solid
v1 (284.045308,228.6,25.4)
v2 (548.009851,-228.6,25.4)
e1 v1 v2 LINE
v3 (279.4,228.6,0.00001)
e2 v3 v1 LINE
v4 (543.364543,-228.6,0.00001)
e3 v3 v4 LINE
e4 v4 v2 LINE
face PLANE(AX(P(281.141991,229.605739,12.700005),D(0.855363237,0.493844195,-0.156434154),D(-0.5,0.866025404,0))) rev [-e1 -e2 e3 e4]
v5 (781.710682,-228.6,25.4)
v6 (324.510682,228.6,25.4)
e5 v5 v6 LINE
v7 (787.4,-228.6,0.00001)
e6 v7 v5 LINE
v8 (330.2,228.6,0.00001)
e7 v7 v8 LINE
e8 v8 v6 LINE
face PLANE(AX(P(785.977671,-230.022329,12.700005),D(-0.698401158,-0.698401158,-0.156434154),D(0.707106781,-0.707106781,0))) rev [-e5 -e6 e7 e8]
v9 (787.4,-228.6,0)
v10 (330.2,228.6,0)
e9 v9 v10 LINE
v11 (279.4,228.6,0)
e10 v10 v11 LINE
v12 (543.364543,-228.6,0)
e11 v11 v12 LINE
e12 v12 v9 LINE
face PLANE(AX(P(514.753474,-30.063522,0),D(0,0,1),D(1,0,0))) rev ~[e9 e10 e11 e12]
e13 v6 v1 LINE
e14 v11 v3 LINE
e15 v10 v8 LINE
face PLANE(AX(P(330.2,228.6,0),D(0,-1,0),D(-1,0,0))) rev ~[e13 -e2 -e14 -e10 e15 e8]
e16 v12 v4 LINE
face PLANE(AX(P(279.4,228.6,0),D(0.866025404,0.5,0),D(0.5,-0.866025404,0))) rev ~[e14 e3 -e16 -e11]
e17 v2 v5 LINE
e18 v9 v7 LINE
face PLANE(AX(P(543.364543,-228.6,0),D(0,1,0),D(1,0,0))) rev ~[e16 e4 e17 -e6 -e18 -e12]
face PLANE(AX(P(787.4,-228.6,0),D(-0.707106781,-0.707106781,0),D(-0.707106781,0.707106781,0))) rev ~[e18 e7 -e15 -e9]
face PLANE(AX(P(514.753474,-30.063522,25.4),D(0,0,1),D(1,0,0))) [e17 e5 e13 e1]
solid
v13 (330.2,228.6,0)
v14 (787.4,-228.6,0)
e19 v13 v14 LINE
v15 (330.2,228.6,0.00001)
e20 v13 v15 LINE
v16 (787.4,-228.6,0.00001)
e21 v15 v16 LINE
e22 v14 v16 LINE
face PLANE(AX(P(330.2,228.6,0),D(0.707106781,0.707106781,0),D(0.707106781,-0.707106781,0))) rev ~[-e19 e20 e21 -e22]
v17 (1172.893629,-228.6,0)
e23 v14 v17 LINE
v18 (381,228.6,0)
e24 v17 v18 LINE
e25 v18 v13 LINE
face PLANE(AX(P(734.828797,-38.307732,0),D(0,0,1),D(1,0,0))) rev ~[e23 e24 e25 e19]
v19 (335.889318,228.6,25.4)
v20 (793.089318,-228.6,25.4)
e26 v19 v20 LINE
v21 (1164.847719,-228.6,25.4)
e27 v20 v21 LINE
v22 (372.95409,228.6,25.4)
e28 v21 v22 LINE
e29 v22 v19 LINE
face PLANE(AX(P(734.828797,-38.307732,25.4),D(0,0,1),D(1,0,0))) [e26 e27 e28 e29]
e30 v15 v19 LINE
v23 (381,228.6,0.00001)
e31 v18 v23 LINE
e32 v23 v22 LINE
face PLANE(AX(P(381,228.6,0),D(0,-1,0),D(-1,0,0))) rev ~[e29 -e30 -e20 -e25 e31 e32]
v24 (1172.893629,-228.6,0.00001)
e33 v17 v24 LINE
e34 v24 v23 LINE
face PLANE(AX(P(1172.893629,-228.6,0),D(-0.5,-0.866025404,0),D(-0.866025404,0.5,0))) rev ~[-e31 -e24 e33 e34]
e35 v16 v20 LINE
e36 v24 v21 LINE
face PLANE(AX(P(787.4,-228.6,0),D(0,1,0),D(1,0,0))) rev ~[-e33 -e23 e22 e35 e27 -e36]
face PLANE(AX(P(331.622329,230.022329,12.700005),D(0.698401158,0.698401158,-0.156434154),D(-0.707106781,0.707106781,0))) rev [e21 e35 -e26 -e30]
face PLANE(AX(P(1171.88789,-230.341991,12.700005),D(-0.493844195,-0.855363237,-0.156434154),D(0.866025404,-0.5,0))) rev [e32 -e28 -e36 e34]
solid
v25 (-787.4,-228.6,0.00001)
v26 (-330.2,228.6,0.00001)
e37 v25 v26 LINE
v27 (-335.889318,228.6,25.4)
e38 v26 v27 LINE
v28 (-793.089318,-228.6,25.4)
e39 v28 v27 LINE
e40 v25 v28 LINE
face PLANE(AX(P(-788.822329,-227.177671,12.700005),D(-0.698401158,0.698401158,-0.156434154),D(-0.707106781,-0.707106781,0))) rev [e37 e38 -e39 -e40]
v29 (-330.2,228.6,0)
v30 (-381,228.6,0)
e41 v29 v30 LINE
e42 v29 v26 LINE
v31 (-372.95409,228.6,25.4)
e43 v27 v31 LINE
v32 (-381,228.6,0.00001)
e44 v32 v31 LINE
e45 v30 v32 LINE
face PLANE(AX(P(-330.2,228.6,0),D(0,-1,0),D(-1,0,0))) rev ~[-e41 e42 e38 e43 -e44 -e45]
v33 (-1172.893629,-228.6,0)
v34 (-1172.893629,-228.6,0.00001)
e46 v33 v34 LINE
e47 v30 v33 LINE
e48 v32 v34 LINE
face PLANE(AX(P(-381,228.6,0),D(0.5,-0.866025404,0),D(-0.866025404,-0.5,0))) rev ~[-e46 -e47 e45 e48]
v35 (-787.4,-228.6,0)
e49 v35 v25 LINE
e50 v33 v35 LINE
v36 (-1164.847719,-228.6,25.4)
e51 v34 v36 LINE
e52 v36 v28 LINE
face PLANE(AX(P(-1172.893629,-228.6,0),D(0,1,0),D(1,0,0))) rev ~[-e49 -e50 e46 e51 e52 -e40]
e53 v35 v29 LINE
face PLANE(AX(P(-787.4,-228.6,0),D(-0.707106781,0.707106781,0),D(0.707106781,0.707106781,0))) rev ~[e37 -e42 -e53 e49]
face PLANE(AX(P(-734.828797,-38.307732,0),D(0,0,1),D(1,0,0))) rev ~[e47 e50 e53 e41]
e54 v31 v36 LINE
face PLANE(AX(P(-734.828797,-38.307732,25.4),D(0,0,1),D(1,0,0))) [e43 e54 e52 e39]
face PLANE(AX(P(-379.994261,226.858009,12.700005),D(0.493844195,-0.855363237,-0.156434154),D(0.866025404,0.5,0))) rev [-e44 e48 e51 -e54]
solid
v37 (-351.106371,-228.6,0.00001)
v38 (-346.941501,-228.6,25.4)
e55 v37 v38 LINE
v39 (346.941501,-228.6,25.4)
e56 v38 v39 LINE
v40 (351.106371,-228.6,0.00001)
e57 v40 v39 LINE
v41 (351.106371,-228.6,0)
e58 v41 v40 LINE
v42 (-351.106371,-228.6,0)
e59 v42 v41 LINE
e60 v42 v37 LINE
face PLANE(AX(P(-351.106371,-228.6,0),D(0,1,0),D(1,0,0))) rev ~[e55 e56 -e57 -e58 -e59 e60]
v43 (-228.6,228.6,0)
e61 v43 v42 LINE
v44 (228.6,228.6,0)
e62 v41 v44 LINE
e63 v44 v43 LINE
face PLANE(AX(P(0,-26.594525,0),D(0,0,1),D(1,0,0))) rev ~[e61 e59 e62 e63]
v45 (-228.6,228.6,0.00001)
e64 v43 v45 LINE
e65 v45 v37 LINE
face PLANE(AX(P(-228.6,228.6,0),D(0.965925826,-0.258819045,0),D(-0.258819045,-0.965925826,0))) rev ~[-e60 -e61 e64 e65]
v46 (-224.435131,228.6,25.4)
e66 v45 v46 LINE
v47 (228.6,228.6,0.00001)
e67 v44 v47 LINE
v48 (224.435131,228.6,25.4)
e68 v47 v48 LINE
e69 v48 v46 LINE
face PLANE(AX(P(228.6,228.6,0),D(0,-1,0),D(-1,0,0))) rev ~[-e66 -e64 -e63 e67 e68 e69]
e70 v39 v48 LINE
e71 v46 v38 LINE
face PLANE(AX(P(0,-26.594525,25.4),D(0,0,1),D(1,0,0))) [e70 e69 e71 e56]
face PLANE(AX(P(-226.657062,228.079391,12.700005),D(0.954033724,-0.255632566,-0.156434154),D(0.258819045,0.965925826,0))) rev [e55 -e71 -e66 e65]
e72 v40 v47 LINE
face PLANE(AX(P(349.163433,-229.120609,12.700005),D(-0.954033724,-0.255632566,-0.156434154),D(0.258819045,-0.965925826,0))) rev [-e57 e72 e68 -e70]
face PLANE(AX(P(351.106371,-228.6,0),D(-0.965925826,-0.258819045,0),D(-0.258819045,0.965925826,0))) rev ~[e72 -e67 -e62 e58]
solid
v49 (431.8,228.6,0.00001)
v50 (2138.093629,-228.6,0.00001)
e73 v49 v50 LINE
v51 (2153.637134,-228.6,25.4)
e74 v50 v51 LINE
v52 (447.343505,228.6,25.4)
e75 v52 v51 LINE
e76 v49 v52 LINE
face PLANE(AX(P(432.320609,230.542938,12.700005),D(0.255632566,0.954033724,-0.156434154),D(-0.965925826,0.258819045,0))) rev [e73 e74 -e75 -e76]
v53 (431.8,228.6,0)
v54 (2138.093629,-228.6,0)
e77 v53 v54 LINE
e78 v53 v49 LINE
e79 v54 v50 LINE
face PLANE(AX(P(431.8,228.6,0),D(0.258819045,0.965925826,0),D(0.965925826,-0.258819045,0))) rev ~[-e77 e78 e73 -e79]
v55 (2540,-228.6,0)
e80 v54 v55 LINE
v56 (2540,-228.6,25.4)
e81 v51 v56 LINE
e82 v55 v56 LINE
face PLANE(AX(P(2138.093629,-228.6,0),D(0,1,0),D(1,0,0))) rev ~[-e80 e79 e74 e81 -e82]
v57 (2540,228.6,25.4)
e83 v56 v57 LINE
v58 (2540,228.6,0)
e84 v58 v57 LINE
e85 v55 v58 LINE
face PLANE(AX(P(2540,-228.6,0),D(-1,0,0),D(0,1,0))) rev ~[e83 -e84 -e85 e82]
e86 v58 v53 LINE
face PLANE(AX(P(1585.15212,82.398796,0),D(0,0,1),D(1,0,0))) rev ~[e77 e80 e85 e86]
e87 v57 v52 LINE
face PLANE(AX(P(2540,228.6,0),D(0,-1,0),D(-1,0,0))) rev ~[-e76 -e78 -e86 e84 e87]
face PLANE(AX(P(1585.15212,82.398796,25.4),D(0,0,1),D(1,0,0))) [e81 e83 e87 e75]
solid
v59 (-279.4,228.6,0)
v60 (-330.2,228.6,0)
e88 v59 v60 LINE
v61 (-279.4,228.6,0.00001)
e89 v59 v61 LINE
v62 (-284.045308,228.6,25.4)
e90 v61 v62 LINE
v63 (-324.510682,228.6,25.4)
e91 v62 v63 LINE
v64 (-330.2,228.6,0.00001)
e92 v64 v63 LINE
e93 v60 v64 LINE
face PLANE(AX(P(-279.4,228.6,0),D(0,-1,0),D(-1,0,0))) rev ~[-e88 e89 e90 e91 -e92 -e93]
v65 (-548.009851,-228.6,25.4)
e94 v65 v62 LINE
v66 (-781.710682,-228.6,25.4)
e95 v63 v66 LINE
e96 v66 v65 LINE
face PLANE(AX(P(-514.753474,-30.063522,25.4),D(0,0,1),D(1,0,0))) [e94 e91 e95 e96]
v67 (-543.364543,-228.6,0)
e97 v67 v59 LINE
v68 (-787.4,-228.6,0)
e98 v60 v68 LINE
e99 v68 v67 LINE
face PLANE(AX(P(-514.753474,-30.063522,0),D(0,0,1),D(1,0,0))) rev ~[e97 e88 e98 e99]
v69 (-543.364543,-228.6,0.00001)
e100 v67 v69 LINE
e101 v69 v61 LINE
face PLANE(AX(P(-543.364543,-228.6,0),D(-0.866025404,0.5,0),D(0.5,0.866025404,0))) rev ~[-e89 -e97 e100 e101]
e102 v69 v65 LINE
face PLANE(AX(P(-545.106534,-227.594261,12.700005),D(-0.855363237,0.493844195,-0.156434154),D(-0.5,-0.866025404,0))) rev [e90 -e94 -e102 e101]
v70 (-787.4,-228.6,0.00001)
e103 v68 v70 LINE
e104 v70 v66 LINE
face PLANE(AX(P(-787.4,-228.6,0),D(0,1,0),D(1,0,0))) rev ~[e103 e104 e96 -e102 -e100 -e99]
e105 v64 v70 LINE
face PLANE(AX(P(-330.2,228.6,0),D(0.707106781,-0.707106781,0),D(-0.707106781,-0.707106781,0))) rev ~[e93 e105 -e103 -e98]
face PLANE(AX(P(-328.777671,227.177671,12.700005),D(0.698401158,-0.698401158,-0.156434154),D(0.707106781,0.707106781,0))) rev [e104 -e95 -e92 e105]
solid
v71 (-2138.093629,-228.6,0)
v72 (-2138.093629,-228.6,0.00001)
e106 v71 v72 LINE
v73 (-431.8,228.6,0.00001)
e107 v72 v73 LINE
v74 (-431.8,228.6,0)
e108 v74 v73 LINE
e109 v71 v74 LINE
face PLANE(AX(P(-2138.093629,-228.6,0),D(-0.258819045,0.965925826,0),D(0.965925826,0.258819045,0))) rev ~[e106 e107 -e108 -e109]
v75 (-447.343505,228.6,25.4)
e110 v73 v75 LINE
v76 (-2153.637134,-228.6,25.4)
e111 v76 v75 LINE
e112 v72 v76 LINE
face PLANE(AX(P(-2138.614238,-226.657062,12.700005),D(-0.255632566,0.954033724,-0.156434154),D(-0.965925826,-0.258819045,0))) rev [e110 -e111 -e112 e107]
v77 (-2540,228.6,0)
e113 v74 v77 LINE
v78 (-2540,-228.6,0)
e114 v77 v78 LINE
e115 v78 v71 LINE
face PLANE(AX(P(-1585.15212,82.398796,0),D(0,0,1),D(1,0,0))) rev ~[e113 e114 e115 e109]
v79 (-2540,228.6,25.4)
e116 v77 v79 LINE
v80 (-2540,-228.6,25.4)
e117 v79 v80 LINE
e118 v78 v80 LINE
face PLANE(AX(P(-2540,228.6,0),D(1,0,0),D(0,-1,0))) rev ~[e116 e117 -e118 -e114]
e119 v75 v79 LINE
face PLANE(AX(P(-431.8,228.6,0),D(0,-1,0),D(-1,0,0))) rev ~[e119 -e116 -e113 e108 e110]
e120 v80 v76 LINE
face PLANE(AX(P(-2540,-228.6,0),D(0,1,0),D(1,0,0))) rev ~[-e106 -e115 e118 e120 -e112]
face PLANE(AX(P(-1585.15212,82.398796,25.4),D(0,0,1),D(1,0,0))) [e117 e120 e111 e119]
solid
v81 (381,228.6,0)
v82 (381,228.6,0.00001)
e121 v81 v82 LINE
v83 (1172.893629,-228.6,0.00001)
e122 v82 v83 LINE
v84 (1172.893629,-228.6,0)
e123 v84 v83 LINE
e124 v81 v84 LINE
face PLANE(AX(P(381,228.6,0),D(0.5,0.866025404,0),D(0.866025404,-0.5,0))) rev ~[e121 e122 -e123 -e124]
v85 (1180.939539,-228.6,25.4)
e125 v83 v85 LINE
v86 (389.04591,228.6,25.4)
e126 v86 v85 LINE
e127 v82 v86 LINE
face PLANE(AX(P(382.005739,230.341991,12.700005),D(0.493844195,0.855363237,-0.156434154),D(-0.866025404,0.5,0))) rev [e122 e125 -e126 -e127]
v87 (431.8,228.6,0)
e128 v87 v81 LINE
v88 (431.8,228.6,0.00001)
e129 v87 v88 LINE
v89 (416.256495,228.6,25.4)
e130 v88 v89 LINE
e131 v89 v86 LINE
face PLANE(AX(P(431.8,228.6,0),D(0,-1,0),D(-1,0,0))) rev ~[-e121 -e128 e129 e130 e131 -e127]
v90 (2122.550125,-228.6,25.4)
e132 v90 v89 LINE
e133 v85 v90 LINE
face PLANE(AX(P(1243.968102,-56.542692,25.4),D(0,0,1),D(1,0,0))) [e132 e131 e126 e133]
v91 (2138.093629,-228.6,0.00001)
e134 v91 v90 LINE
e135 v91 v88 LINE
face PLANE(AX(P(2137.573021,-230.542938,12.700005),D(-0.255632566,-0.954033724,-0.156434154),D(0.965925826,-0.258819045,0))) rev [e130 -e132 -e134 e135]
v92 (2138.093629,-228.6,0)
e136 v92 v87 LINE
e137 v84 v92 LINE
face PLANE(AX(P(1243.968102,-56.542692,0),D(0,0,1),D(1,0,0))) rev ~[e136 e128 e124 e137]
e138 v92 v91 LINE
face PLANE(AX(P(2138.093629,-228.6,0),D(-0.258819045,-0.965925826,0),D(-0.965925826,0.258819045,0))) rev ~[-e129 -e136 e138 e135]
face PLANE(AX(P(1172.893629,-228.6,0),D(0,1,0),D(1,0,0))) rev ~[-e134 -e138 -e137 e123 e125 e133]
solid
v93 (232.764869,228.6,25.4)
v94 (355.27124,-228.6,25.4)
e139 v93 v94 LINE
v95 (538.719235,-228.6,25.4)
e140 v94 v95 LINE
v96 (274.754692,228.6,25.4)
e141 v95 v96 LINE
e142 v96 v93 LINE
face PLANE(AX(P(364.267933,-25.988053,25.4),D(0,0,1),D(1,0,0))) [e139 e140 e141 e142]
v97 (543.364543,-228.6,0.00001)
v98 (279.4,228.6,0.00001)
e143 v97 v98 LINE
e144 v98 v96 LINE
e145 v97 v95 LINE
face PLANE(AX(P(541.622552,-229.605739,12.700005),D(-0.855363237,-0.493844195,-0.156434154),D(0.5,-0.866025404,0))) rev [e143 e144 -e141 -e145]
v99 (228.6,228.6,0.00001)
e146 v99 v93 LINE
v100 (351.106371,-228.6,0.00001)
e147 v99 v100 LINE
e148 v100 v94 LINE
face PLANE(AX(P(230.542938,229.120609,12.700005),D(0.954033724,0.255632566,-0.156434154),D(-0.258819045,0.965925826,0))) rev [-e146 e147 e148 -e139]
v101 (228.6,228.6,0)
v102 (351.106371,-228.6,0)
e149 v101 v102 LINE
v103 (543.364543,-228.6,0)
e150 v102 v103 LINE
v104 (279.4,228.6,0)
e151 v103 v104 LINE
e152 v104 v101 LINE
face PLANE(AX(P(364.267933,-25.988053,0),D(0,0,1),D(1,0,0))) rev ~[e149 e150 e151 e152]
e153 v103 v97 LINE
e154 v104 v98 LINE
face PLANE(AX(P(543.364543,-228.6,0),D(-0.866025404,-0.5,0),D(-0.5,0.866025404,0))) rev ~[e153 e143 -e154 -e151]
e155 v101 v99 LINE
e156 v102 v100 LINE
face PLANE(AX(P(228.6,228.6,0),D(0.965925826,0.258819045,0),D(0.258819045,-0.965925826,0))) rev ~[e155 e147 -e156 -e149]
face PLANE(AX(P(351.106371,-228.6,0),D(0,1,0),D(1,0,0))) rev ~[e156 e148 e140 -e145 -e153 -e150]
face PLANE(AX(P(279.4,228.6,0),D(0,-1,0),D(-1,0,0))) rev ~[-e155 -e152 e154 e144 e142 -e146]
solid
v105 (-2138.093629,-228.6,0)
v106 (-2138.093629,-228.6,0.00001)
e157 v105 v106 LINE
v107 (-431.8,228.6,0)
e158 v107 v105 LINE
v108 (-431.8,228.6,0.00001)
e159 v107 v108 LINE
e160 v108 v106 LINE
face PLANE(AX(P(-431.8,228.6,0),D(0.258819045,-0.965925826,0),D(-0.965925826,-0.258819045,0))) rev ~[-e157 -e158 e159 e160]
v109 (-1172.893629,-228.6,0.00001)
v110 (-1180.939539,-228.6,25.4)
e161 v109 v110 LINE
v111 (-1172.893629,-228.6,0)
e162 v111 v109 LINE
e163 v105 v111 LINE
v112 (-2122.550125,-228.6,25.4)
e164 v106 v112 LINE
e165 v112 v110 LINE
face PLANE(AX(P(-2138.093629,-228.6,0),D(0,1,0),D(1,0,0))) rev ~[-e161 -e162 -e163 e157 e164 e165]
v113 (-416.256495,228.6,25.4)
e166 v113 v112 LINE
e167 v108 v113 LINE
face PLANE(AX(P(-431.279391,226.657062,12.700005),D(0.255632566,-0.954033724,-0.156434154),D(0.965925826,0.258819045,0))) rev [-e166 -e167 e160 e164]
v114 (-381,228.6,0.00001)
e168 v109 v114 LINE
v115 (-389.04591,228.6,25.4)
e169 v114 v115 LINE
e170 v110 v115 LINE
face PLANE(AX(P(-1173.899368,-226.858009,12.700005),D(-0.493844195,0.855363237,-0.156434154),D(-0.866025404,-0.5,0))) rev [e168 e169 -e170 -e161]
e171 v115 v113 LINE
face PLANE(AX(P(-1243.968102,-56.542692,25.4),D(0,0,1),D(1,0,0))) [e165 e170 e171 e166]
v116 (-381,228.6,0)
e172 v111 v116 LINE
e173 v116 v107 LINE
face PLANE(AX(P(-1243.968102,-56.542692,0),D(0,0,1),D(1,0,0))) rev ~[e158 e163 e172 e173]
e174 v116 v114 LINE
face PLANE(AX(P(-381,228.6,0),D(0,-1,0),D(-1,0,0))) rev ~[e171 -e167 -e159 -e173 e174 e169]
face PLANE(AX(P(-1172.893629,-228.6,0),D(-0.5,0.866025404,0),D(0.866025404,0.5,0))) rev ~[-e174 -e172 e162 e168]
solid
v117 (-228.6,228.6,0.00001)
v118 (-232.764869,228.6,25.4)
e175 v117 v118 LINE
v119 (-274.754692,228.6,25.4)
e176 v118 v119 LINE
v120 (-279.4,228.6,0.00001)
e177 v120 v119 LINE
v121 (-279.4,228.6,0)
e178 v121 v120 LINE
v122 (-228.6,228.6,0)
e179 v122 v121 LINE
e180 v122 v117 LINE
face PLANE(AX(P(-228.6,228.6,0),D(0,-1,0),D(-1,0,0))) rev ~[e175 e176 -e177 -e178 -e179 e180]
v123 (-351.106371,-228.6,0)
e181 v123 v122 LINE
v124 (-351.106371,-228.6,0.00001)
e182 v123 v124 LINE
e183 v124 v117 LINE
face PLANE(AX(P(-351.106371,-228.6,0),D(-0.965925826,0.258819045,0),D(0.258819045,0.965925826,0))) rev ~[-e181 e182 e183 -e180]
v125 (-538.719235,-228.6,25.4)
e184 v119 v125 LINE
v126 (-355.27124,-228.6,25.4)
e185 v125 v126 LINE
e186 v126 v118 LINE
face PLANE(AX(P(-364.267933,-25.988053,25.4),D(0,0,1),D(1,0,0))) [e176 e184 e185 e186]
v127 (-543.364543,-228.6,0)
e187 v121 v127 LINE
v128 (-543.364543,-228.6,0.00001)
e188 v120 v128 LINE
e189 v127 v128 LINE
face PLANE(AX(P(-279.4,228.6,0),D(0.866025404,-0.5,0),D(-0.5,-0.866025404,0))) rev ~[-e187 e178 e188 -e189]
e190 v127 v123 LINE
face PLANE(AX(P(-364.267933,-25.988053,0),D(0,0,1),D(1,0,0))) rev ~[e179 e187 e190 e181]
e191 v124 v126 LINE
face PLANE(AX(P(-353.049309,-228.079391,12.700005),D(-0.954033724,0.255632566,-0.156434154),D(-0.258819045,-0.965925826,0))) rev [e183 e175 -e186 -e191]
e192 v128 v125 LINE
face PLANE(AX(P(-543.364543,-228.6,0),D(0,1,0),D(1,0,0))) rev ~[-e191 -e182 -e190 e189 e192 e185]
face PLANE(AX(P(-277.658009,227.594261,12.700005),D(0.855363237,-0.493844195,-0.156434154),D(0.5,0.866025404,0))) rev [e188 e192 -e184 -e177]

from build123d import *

# Parameters (mm, degrees)
F2_DEPTH    = 25.4
F3_DEPTH    = 25.4
F4_DEPTH    = 25.4
F5_DEPTH    = 25.4
F6_DEPTH    = 25.4
F7_DEPTH    = 25.4
F8_DEPTH    = 25.4
F9_DEPTH    = 25.4
F10_DEPTH   = 25.4
F11_DEPTH   = 25.4
F12_DEPTH   = 25.4
F13_SIZE2   = 4.022955
F13_SIZE    = 25.39999
F14_SIZE2   = 4.022955
F14_SIZE    = 25.39999
F14_2_SIZE2 = 4.022955
F14_2_SIZE  = 25.39999
F15_SIZE2   = 4.022955
F15_SIZE    = 25.39999
F15_2_SIZE2 = 4.022955
F15_2_SIZE  = 25.39999
F16_SIZE2   = 4.022955
F16_SIZE    = 25.39999
F16_2_SIZE2 = 4.022955
F16_2_SIZE  = 25.39999
F17_SIZE2   = 4.022955
F17_SIZE    = 25.39999
F17_2_SIZE2 = 4.022955
F17_2_SIZE  = 25.39999
F18_SIZE2   = 4.022955
F18_SIZE    = 25.39999
F18_2_SIZE2 = 4.022955
F18_2_SIZE  = 25.39999
F19_SIZE2   = 4.022955
F19_SIZE    = 25.39999
F19_2_SIZE2 = 4.022955
F19_2_SIZE  = 25.39999
F20_SIZE2   = 4.022955
F20_SIZE    = 25.39999
F20_2_SIZE2 = 4.022955
F20_2_SIZE  = 25.39999
F21_SIZE2   = 4.022955
F21_SIZE    = 25.39999
F21_2_SIZE2 = 4.022955
F21_2_SIZE  = 25.39999
F22_SIZE2   = 4.022955
F22_SIZE    = 25.39999
F22_2_SIZE2 = 4.022955
F22_2_SIZE  = 25.39999
F23_SIZE2   = 4.022955
F23_SIZE    = 25.39999


# Not quite as in the source:
# - a fillet or chamfer is up to 0.001 mm smaller than in the source, because OpenCascade refuses the exact size


with BuildPart() as f2:
    # F1 (on Top) → F2 (new body)
    with BuildSketch(Plane.XY):
        Polygon((-431.8, 228.6), (-2540, 228.6), (-2540, -228.6), (-2138.0936292205, -228.6), align=None)
    extrude(amount=F2_DEPTH)

    # F13 (size 25.4 and 4.0229647842 in the source; OpenCascade refuses exactly that, so slightly less here)
    f13_edges = [f2.edges().sort_by_distance(p)[0] for p in [
        (-1284.946815, 0, 25.4),
    ]]
    f13_side = f2.faces().sort_by_distance((-1284.946815, 0, 12.7))[0]
    chamfer(f13_edges, length=F13_SIZE, length2=F13_SIZE2, reference=f13_side)


with BuildPart() as f3:
    # F1 (on Top) → F3 (new body)
    with BuildSketch(Plane.XY):
        Polygon((-381, 228.6), (-431.8, 228.6), (-2138.0936292205, -228.6), (-1172.8936292205, -228.6), align=None)
    extrude(amount=F3_DEPTH)

    # F14 (size 25.4 and 4.0229647842 in the source; OpenCascade refuses exactly that, so slightly less here)
    f14_edges = [f3.edges().sort_by_distance(p)[0] for p in [
        (-1284.946815, 0, 25.4),
    ]]
    f14_side = f3.faces().sort_by_distance((-1284.946815, 0, 12.7))[0]
    chamfer(f14_edges, length=F14_SIZE, length2=F14_SIZE2, reference=f14_side)

    # F14#2 (size 25.4 and 4.0229647842 in the source; OpenCascade refuses exactly that, so slightly less here)
    f14_2_edges = [f3.edges().sort_by_distance(p)[0] for p in [
        (-776.946815, 0, 25.4),
    ]]
    f14_2_side = f3.faces().sort_by_distance((-776.946815, 0, 12.7))[0]
    chamfer(f14_2_edges, length=F14_2_SIZE, length2=F14_2_SIZE2, reference=f14_2_side)


with BuildPart() as f4:
    # F1 (on Top) → F4 (new body)
    with BuildSketch(Plane.XY):
        Polygon((-330.2, 228.6), (-381, 228.6), (-1172.8936292205, -228.6), (-787.4, -228.6), align=None)
    extrude(amount=F4_DEPTH)

    # F15 (size 25.4 and 4.0229647842 in the source; OpenCascade refuses exactly that, so slightly less here)
    f15_edges = [f4.edges().sort_by_distance(p)[0] for p in [
        (-776.946815, 0, 25.4),
    ]]
    f15_side = f4.faces().sort_by_distance((-776.946815, 0, 12.7))[0]
    chamfer(f15_edges, length=F15_SIZE, length2=F15_SIZE2, reference=f15_side)

    # F15#2 (size 25.4 and 4.0229647842 in the source; OpenCascade refuses exactly that, so slightly less here)
    f15_2_edges = [f4.edges().sort_by_distance(p)[0] for p in [
        (-558.8, 0, 25.4),
    ]]
    f15_2_side = f4.faces().sort_by_distance((-558.8, 0, 12.7))[0]
    chamfer(f15_2_edges, length=F15_2_SIZE, length2=F15_2_SIZE2, reference=f15_2_side)


with BuildPart() as f5:
    # F1 (on Top) → F5 (new body)
    with BuildSketch(Plane.XY):
        Polygon((-279.4, 228.6), (-330.2, 228.6), (-787.4, -228.6), (-543.3645430735, -228.6), align=None)
    extrude(amount=F5_DEPTH)

    # F16 (size 25.4 and 4.0229647842 in the source; OpenCascade refuses exactly that, so slightly less here)
    f16_edges = [f5.edges().sort_by_distance(p)[0] for p in [
        (-558.8, 0, 25.4),
    ]]
    f16_side = f5.faces().sort_by_distance((-558.8, 0, 12.7))[0]
    chamfer(f16_edges, length=F16_SIZE, length2=F16_SIZE2, reference=f16_side)

    # F16#2 (size 25.4 and 4.0229647842 in the source; OpenCascade refuses exactly that, so slightly less here)
    f16_2_edges = [f5.edges().sort_by_distance(p)[0] for p in [
        (-411.382272, 0, 25.4),
    ]]
    f16_2_side = f5.faces().sort_by_distance((-411.382272, 0, 12.7))[0]
    chamfer(f16_2_edges, length=F16_2_SIZE, length2=F16_2_SIZE2, reference=f16_2_side)


with BuildPart() as f6:
    # F1 (on Top) → F6 (new body)
    with BuildSketch(Plane.XY):
        Polygon((-228.6, 228.6), (-279.4, 228.6), (-543.3645430735, -228.6), (-351.1063707795, -228.6), align=None)
    extrude(amount=F6_DEPTH)

    # F17 (size 25.4 and 4.0229647842 in the source; OpenCascade refuses exactly that, so slightly less here)
    f17_edges = [f6.edges().sort_by_distance(p)[0] for p in [
        (-411.382272, 0, 25.4),
    ]]
    f17_side = f6.faces().sort_by_distance((-411.382272, 0, 12.7))[0]
    chamfer(f17_edges, length=F17_SIZE, length2=F17_SIZE2, reference=f17_side)

    # F17#2 (size 25.4 and 4.0229647842 in the source; OpenCascade refuses exactly that, so slightly less here)
    f17_2_edges = [f6.edges().sort_by_distance(p)[0] for p in [
        (-289.853185, 0, 25.4),
    ]]
    f17_2_side = f6.faces().sort_by_distance((-289.853185, 0, 12.7))[0]
    chamfer(f17_2_edges, length=F17_2_SIZE, length2=F17_2_SIZE2, reference=f17_2_side)


with BuildPart() as f7:
    # F1 (on Top) → F7 (new body)
    with BuildSketch(Plane.XY):
        Polygon((228.6, 228.6), (-228.6, 228.6), (-351.1063707795, -228.6), (351.1063707795, -228.6), align=None)
    extrude(amount=F7_DEPTH)

    # F18 (size 25.4 and 4.0229647842 in the source; OpenCascade refuses exactly that, so slightly less here)
    f18_edges = [f7.edges().sort_by_distance(p)[0] for p in [
        (-289.853185, 0, 25.4),
    ]]
    f18_side = f7.faces().sort_by_distance((-289.853185, 0, 12.7))[0]
    chamfer(f18_edges, length=F18_SIZE, length2=F18_SIZE2, reference=f18_side)

    # F18#2 (size 25.4 and 4.0229647842 in the source; OpenCascade refuses exactly that, so slightly less here)
    f18_2_edges = [f7.edges().sort_by_distance(p)[0] for p in [
        (289.853185, 0, 25.4),
    ]]
    f18_2_side = f7.faces().sort_by_distance((289.853185, 0, 12.7))[0]
    chamfer(f18_2_edges, length=F18_2_SIZE, length2=F18_2_SIZE2, reference=f18_2_side)


with BuildPart() as f8:
    # F1 (on Top) → F8 (new body)
    with BuildSketch(Plane.XY):
        Polygon((279.4, 228.6), (228.6, 228.6), (351.1063707795, -228.6), (543.3645430735, -228.6), align=None)
    extrude(amount=F8_DEPTH)

    # F19 (size 25.4 and 4.0229647842 in the source; OpenCascade refuses exactly that, so slightly less here)
    f19_edges = [f8.edges().sort_by_distance(p)[0] for p in [
        (289.853185, 0, 25.4),
    ]]
    f19_side = f8.faces().sort_by_distance((289.853185, 0, 12.7))[0]
    chamfer(f19_edges, length=F19_SIZE, length2=F19_SIZE2, reference=f19_side)

    # F19#2 (size 25.4 and 4.0229647842 in the source; OpenCascade refuses exactly that, so slightly less here)
    f19_2_edges = [f8.edges().sort_by_distance(p)[0] for p in [
        (411.382272, 0, 25.4),
    ]]
    f19_2_side = f8.faces().sort_by_distance((411.382272, 0, 12.7))[0]
    chamfer(f19_2_edges, length=F19_2_SIZE, length2=F19_2_SIZE2, reference=f19_2_side)


with BuildPart() as f9:
    # F1 (on Top) → F9 (new body)
    with BuildSketch(Plane.XY):
        Polygon((330.2, 228.6), (279.4, 228.6), (543.3645430735, -228.6), (787.4, -228.6), align=None)
    extrude(amount=F9_DEPTH)

    # F20 (size 25.4 and 4.0229647842 in the source; OpenCascade refuses exactly that, so slightly less here)
    f20_edges = [f9.edges().sort_by_distance(p)[0] for p in [
        (411.382272, 0, 25.4),
    ]]
    f20_side = f9.faces().sort_by_distance((411.382272, 0, 12.7))[0]
    chamfer(f20_edges, length=F20_SIZE, length2=F20_SIZE2, reference=f20_side)

    # F20#2 (size 25.4 and 4.0229647842 in the source; OpenCascade refuses exactly that, so slightly less here)
    f20_2_edges = [f9.edges().sort_by_distance(p)[0] for p in [
        (558.8, 0, 25.4),
    ]]
    f20_2_side = f9.faces().sort_by_distance((558.8, 0, 12.7))[0]
    chamfer(f20_2_edges, length=F20_2_SIZE, length2=F20_2_SIZE2, reference=f20_2_side)


with BuildPart() as f10:
    # F1 (on Top) → F10 (new body)
    with BuildSketch(Plane.XY):
        Polygon((381, 228.6), (330.2, 228.6), (787.4, -228.6), (1172.8936292205, -228.6), align=None)
    extrude(amount=F10_DEPTH)

    # F21 (size 25.4 and 4.0229647842 in the source; OpenCascade refuses exactly that, so slightly less here)
    f21_edges = [f10.edges().sort_by_distance(p)[0] for p in [
        (558.8, 0, 25.4),
    ]]
    f21_side = f10.faces().sort_by_distance((558.8, 0, 12.7))[0]
    chamfer(f21_edges, length=F21_SIZE, length2=F21_SIZE2, reference=f21_side)

    # F21#2 (size 25.4 and 4.0229647842 in the source; OpenCascade refuses exactly that, so slightly less here)
    f21_2_edges = [f10.edges().sort_by_distance(p)[0] for p in [
        (776.946815, 0, 25.4),
    ]]
    f21_2_side = f10.faces().sort_by_distance((776.946815, 0, 12.7))[0]
    chamfer(f21_2_edges, length=F21_2_SIZE, length2=F21_2_SIZE2, reference=f21_2_side)


with BuildPart() as f11:
    # F1 (on Top) → F11 (new body)
    with BuildSketch(Plane.XY):
        Polygon((431.8, 228.6), (381, 228.6), (1172.8936292205, -228.6), (2138.0936292205, -228.6), align=None)
    extrude(amount=F11_DEPTH)

    # F22 (size 25.4 and 4.0229647842 in the source; OpenCascade refuses exactly that, so slightly less here)
    f22_edges = [f11.edges().sort_by_distance(p)[0] for p in [
        (776.946815, 0, 25.4),
    ]]
    f22_side = f11.faces().sort_by_distance((776.946815, 0, 12.7))[0]
    chamfer(f22_edges, length=F22_SIZE, length2=F22_SIZE2, reference=f22_side)

    # F22#2 (size 25.4 and 4.0229647842 in the source; OpenCascade refuses exactly that, so slightly less here)
    f22_2_edges = [f11.edges().sort_by_distance(p)[0] for p in [
        (1284.946815, 0, 25.4),
    ]]
    f22_2_side = f11.faces().sort_by_distance((1284.946815, 0, 12.7))[0]
    chamfer(f22_2_edges, length=F22_2_SIZE, length2=F22_2_SIZE2, reference=f22_2_side)


with BuildPart() as f12:
    # F1 (on Top) → F12 (new body)
    with BuildSketch(Plane.XY):
        Polygon((2540, 228.6), (431.8, 228.6), (2138.0936292205, -228.6), (2540, -228.6), align=None)
    extrude(amount=F12_DEPTH)

    # F23 (size 25.4 and 4.0229647842 in the source; OpenCascade refuses exactly that, so slightly less here)
    f23_edges = [f12.edges().sort_by_distance(p)[0] for p in [
        (1284.946815, 0, 25.4),
    ]]
    f23_side = f12.faces().sort_by_distance((1284.946815, 0, 12.7))[0]
    chamfer(f23_edges, length=F23_SIZE, length2=F23_SIZE2, reference=f23_side)


solid = Compound([f2.part, f3.part, f4.part, f5.part, f6.part, f7.part, f8.part, f9.part, f10.part, f11.part, f12.part])
